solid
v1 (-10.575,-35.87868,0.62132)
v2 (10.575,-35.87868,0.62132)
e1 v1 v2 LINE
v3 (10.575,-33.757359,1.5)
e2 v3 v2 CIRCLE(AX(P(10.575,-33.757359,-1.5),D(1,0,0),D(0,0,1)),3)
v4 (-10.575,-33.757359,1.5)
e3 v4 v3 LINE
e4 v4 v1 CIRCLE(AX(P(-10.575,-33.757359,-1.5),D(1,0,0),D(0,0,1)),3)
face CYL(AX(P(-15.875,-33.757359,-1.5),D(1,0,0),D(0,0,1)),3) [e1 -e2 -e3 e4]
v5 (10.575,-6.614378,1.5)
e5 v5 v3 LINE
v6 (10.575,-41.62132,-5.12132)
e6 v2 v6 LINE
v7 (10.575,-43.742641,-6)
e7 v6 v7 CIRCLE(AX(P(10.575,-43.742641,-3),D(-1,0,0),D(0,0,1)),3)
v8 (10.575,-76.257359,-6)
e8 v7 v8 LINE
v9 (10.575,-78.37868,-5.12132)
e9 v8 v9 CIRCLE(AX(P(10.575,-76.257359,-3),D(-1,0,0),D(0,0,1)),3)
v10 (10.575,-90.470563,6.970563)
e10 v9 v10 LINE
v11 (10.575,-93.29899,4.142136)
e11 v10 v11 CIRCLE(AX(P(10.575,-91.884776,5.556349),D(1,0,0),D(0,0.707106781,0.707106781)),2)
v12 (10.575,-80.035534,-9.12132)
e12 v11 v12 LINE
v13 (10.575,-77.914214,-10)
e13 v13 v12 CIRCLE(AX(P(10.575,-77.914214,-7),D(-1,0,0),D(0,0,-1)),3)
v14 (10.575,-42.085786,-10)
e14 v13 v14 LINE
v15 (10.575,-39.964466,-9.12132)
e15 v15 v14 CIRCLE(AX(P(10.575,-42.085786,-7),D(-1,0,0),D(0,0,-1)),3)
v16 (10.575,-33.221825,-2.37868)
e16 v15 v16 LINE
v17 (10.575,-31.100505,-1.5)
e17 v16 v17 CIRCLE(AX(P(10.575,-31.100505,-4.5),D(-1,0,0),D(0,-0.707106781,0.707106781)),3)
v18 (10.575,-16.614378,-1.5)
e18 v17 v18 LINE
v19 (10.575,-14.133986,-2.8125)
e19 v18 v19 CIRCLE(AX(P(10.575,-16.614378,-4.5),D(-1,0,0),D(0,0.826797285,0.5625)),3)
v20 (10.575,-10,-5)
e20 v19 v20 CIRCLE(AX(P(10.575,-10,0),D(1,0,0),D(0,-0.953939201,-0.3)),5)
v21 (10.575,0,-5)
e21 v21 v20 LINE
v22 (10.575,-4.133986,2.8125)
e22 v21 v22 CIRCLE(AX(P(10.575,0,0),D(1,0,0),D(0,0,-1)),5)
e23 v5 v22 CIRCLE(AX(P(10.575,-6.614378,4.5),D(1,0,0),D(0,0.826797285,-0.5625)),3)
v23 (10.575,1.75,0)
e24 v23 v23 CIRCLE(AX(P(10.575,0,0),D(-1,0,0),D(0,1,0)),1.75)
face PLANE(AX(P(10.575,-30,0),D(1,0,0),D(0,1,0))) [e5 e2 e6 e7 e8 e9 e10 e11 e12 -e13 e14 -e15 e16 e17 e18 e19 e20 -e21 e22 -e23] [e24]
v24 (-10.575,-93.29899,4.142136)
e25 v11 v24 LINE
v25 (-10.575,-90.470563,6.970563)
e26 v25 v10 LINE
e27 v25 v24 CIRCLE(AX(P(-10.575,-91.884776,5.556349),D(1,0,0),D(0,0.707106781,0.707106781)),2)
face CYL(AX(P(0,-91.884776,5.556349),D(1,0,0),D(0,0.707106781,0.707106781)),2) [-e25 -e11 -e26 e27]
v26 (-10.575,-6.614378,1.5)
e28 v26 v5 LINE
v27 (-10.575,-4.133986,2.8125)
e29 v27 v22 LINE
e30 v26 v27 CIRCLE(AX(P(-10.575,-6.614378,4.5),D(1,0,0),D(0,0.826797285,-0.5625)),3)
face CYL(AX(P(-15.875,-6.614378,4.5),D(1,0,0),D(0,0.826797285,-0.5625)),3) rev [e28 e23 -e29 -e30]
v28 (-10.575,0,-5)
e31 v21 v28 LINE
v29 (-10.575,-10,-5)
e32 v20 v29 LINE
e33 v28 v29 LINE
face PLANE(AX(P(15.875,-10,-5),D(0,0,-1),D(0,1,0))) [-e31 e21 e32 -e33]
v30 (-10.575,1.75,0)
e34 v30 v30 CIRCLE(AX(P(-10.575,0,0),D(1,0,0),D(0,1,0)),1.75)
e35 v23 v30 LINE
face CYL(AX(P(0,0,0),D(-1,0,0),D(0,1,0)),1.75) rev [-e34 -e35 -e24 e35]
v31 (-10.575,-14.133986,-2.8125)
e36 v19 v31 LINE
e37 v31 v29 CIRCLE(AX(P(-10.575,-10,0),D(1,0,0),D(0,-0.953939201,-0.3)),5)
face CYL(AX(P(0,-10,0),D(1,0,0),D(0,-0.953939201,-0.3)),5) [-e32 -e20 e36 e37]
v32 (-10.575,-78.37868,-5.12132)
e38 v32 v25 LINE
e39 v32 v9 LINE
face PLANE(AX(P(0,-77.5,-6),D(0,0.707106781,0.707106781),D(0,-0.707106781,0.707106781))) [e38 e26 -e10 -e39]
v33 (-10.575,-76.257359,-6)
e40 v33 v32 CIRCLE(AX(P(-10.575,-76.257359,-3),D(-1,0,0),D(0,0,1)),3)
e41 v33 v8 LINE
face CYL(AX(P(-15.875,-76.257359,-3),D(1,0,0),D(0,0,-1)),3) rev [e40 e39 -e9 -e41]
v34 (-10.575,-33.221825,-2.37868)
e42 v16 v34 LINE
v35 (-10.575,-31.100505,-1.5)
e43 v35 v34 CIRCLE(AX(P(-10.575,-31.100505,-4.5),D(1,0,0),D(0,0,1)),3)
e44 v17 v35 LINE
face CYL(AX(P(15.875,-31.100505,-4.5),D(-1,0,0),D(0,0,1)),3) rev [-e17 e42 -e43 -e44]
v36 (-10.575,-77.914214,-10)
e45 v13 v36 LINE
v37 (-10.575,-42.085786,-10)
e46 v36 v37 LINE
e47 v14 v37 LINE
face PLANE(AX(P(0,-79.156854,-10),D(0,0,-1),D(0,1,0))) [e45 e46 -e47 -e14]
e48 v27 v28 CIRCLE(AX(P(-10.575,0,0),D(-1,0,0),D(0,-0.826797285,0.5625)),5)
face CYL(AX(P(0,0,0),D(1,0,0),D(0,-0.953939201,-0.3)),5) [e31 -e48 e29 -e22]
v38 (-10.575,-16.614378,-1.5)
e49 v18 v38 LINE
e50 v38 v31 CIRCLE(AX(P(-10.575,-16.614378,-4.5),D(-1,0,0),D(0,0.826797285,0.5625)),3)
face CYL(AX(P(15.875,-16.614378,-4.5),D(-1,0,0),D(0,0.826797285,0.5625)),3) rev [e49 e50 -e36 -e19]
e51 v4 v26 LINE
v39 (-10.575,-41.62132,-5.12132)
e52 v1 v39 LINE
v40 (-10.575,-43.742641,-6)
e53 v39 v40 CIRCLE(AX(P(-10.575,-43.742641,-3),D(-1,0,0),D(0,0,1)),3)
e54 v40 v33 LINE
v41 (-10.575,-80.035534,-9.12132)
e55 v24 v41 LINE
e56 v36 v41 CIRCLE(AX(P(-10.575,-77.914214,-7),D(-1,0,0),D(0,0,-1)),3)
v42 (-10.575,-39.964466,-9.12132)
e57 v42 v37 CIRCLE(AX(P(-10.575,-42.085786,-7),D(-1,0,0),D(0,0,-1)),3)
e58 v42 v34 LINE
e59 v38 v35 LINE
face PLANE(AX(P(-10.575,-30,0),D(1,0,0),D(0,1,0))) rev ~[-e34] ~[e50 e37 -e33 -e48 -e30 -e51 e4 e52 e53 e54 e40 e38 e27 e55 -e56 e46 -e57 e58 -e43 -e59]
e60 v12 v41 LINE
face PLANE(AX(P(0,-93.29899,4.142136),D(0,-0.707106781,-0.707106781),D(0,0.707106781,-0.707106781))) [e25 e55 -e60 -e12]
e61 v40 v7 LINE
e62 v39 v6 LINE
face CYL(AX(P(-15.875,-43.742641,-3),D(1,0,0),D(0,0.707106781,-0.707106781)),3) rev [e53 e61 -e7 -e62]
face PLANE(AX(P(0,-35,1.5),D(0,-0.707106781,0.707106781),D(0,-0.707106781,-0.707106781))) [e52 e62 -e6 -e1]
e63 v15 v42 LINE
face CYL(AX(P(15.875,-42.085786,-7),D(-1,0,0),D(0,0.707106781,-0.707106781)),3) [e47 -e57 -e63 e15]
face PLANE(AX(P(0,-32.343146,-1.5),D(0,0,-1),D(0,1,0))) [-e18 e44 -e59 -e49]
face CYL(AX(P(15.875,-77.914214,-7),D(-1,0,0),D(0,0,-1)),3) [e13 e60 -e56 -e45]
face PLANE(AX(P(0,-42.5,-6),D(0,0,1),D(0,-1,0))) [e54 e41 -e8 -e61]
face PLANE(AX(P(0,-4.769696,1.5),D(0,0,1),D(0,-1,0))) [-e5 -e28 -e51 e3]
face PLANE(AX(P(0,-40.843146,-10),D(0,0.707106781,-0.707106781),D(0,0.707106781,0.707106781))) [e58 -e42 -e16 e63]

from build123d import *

# Parameters (mm, degrees)
F0_R          = 1.75
F1_DEPTH      = 15.875
F3_DEPTH      = 31.75
F4_R          = 3
F5_W          = 5
F5_H          = 35
F6_DEPTH      = 10.001
F6_DEPTH_BACK = 7.5573491861
F7_T1_DEPTH   = 8.7055800262
F7_T3_DEPTH   = 8.75
F7_T5_DEPTH   = 8.75
F7_T7_DEPTH   = 8.7055800262
F8_DEPTH      = 0.3
F9_DEPTH      = 0.3
F10_DEPTH     = 5.3
F11_DEPTH     = 5.3


# Not quite as in the source:
# - a fillet or chamfer that OpenCascade refuses, or shapes differently, is made with other operations: its cross-section is extruded or revolved along the edge and cut away or added


with BuildPart() as f1:
    # F0 (on Right) → F1 (new body, symmetric)
    with BuildSketch(Plane.YZ):
        with BuildLine():
            Line((-5.2303039929, -1.5), (-4.7696960071, -1.5))
            ThreePointArc((-4.7696960071, -1.5), (5, 0), (-4.7696960071, 1.5))
            Line((-4.7696960071, 1.5), (-35, 1.5))
            Line((-35, 1.5), (-42.5, -6))
            Line((-42.5, -6), (-77.5, -6))
            Line((-77.5, -6), (-90.4705627485, 6.9705627485))
            ThreePointArc((-90.4705627485, 6.9705627485), (-93.2989898732, 6.9705627485), (-93.2989898732, 4.1421356237))
            Line((-93.2989898732, 4.1421356237), (-79.1568542495, -10))
            Line((-79.1568542495, -10), (-40.8431457505, -10))
            Line((-40.8431457505, -10), (-32.3431457505, -1.5))
            Line((-32.3431457505, -1.5), (-14.7696960071, -1.5))
            ThreePointArc((-14.7696960071, -1.5), (-10, -5), (-5.2303039929, -1.5))
        make_face()
        Circle(F0_R, mode=Mode.SUBTRACT)
    extrude(amount=F1_DEPTH, both=True)

    # F2 (on face) → F3 (join, through all)
    with BuildSketch(Plane.YZ.offset(15.875)):
        with BuildLine():
            ThreePointArc((-5.2303039929, -1.5), (-7.0419601085, -4.0311288741), (-10, -5))
            Line((-10, -5), (0, -5))
            ThreePointArc((0, -5), (-2.9580398915, -4.0311288741), (-4.7696960071, -1.5))
            Line((-4.7696960071, -1.5), (-5.2303039929, -1.5))
        make_face()
    extrude(amount=-F3_DEPTH)

    # F4
    f4_edges = [f1.edges().sort_by_distance(p)[0] for p in [
        (0, -4.769696, 1.5),
        (0, -14.769696, -1.5),
        (0, -77.5, -6),
        (0, -79.156854, -10),
        (0, -40.843146, -10),
        (0, -32.343146, -1.5),
        (0, -42.5, -6),
        (0, -35, 1.5),
    ]]
    fillet(f4_edges, radius=F4_R)

    # F5 (on Top) → F6 (cut, two sides)
    with BuildSketch(Plane.XY) as f6_sk:
        with Locations((-13.375, -12.5)):
            Rectangle(F5_W, F5_H)
        with Locations((13.375, -12.5)):
            Rectangle(F5_W, F5_H)
    extrude(amount=-F6_DEPTH, mode=Mode.SUBTRACT)
    extrude(f6_sk.sketch, amount=F6_DEPTH_BACK, mode=Mode.SUBTRACT)

    # F7: fillet of radius 1.5 on 4 edges, made by hand

    # F7_s2 → F7_t1 (cut)
    with BuildSketch(Plane.YZ.offset(10.875)):
        with BuildLine():
            ThreePointArc((-31.3668350211, -1.5118453264), (-30.3932598615, -1.0302531824), (-30, -0.0177679895))
            Line((-30, -0.0177679895), (-29.85, -0.0177679895))
            Line((-29.85, -0.0177679895), (-29.85, -1.5))
            Line((-29.85, -1.5), (-30, -1.65))
            ThreePointArc((-30, -1.65), (-31.1005050634, -1.65), (-31.3535185232, -1.66125306))
            Line((-31.3535185232, -1.66125306), (-31.3668350211, -1.5118453264))
        make_face()
    extrude(amount=F7_T1_DEPTH, mode=Mode.SUBTRACT)

    # F7_s4 → F7_t3 (cut)
    with BuildSketch(Plane.YZ.offset(10.875)):
        with BuildLine():
            ThreePointArc((-30, 0), (-30.4393398282, 1.0606601718), (-31.5, 1.5))
            Line((-31.5, 1.5), (-30, 1.5))
            Line((-30, 1.5), (-30, 0))
        make_face()
    extrude(amount=F7_T3_DEPTH, mode=Mode.SUBTRACT)

    # F7_s6 → F7_t5 (cut)
    with BuildSketch(Plane.YZ.offset(-19.625)):
        with BuildLine():
            ThreePointArc((-30, 0), (-30.4393398282, 1.0606601718), (-31.5, 1.5))
            Line((-31.5, 1.5), (-30, 1.5))
            Line((-30, 1.5), (-30, 0))
        make_face()
    extrude(amount=F7_T5_DEPTH, mode=Mode.SUBTRACT)

    # F7_s8 → F7_t7 (cut)
    with BuildSketch(Plane.YZ.offset(-19.5805800262)):
        with BuildLine():
            ThreePointArc((-31.3668350211, -1.5118453264), (-30.3932598615, -1.0302531824), (-30, -0.0177679895))
            Line((-30, -0.0177679895), (-29.85, -0.0177679895))
            Line((-29.85, -0.0177679895), (-29.85, -1.5))
            Line((-29.85, -1.5), (-30, -1.65))
            ThreePointArc((-30, -1.65), (-31.1005050634, -1.65), (-31.3535185232, -1.66125306))
            Line((-31.3535185232, -1.66125306), (-31.3668350211, -1.5118453264))
        make_face()
    extrude(amount=F7_T7_DEPTH, mode=Mode.SUBTRACT)

    # F8 (cut): a face of the model
    f8_faces = [f1.faces().sort_by_distance(p)[0] for p in [
        (10.875, -9.1101781633, -0.6280033564),
    ]]
    extrude(f8_faces, amount=-F8_DEPTH, mode=Mode.SUBTRACT)

    # F9 (cut): a face of the model
    f9_faces = [f1.faces().sort_by_distance(p)[0] for p in [
        (-10.875, -9.1101781633, -0.6280033564),
    ]]
    extrude(f9_faces, amount=-F9_DEPTH, mode=Mode.SUBTRACT)

    # F10 (cut, through all): a face of the model
    f10_faces = [f1.faces().sort_by_distance(p)[0] for p in [
        (15.875, -86.1987808312, -2.0211113015),
    ]]
    extrude(f10_faces, amount=-F10_DEPTH, mode=Mode.SUBTRACT)

    # F11 (cut, through all): a face of the model
    f11_faces = [f1.faces().sort_by_distance(p)[0] for p in [
        (-15.875, -86.1987808312, -2.0211113015),
    ]]
    extrude(f11_faces, amount=-F11_DEPTH, mode=Mode.SUBTRACT)


solid = f1.part
